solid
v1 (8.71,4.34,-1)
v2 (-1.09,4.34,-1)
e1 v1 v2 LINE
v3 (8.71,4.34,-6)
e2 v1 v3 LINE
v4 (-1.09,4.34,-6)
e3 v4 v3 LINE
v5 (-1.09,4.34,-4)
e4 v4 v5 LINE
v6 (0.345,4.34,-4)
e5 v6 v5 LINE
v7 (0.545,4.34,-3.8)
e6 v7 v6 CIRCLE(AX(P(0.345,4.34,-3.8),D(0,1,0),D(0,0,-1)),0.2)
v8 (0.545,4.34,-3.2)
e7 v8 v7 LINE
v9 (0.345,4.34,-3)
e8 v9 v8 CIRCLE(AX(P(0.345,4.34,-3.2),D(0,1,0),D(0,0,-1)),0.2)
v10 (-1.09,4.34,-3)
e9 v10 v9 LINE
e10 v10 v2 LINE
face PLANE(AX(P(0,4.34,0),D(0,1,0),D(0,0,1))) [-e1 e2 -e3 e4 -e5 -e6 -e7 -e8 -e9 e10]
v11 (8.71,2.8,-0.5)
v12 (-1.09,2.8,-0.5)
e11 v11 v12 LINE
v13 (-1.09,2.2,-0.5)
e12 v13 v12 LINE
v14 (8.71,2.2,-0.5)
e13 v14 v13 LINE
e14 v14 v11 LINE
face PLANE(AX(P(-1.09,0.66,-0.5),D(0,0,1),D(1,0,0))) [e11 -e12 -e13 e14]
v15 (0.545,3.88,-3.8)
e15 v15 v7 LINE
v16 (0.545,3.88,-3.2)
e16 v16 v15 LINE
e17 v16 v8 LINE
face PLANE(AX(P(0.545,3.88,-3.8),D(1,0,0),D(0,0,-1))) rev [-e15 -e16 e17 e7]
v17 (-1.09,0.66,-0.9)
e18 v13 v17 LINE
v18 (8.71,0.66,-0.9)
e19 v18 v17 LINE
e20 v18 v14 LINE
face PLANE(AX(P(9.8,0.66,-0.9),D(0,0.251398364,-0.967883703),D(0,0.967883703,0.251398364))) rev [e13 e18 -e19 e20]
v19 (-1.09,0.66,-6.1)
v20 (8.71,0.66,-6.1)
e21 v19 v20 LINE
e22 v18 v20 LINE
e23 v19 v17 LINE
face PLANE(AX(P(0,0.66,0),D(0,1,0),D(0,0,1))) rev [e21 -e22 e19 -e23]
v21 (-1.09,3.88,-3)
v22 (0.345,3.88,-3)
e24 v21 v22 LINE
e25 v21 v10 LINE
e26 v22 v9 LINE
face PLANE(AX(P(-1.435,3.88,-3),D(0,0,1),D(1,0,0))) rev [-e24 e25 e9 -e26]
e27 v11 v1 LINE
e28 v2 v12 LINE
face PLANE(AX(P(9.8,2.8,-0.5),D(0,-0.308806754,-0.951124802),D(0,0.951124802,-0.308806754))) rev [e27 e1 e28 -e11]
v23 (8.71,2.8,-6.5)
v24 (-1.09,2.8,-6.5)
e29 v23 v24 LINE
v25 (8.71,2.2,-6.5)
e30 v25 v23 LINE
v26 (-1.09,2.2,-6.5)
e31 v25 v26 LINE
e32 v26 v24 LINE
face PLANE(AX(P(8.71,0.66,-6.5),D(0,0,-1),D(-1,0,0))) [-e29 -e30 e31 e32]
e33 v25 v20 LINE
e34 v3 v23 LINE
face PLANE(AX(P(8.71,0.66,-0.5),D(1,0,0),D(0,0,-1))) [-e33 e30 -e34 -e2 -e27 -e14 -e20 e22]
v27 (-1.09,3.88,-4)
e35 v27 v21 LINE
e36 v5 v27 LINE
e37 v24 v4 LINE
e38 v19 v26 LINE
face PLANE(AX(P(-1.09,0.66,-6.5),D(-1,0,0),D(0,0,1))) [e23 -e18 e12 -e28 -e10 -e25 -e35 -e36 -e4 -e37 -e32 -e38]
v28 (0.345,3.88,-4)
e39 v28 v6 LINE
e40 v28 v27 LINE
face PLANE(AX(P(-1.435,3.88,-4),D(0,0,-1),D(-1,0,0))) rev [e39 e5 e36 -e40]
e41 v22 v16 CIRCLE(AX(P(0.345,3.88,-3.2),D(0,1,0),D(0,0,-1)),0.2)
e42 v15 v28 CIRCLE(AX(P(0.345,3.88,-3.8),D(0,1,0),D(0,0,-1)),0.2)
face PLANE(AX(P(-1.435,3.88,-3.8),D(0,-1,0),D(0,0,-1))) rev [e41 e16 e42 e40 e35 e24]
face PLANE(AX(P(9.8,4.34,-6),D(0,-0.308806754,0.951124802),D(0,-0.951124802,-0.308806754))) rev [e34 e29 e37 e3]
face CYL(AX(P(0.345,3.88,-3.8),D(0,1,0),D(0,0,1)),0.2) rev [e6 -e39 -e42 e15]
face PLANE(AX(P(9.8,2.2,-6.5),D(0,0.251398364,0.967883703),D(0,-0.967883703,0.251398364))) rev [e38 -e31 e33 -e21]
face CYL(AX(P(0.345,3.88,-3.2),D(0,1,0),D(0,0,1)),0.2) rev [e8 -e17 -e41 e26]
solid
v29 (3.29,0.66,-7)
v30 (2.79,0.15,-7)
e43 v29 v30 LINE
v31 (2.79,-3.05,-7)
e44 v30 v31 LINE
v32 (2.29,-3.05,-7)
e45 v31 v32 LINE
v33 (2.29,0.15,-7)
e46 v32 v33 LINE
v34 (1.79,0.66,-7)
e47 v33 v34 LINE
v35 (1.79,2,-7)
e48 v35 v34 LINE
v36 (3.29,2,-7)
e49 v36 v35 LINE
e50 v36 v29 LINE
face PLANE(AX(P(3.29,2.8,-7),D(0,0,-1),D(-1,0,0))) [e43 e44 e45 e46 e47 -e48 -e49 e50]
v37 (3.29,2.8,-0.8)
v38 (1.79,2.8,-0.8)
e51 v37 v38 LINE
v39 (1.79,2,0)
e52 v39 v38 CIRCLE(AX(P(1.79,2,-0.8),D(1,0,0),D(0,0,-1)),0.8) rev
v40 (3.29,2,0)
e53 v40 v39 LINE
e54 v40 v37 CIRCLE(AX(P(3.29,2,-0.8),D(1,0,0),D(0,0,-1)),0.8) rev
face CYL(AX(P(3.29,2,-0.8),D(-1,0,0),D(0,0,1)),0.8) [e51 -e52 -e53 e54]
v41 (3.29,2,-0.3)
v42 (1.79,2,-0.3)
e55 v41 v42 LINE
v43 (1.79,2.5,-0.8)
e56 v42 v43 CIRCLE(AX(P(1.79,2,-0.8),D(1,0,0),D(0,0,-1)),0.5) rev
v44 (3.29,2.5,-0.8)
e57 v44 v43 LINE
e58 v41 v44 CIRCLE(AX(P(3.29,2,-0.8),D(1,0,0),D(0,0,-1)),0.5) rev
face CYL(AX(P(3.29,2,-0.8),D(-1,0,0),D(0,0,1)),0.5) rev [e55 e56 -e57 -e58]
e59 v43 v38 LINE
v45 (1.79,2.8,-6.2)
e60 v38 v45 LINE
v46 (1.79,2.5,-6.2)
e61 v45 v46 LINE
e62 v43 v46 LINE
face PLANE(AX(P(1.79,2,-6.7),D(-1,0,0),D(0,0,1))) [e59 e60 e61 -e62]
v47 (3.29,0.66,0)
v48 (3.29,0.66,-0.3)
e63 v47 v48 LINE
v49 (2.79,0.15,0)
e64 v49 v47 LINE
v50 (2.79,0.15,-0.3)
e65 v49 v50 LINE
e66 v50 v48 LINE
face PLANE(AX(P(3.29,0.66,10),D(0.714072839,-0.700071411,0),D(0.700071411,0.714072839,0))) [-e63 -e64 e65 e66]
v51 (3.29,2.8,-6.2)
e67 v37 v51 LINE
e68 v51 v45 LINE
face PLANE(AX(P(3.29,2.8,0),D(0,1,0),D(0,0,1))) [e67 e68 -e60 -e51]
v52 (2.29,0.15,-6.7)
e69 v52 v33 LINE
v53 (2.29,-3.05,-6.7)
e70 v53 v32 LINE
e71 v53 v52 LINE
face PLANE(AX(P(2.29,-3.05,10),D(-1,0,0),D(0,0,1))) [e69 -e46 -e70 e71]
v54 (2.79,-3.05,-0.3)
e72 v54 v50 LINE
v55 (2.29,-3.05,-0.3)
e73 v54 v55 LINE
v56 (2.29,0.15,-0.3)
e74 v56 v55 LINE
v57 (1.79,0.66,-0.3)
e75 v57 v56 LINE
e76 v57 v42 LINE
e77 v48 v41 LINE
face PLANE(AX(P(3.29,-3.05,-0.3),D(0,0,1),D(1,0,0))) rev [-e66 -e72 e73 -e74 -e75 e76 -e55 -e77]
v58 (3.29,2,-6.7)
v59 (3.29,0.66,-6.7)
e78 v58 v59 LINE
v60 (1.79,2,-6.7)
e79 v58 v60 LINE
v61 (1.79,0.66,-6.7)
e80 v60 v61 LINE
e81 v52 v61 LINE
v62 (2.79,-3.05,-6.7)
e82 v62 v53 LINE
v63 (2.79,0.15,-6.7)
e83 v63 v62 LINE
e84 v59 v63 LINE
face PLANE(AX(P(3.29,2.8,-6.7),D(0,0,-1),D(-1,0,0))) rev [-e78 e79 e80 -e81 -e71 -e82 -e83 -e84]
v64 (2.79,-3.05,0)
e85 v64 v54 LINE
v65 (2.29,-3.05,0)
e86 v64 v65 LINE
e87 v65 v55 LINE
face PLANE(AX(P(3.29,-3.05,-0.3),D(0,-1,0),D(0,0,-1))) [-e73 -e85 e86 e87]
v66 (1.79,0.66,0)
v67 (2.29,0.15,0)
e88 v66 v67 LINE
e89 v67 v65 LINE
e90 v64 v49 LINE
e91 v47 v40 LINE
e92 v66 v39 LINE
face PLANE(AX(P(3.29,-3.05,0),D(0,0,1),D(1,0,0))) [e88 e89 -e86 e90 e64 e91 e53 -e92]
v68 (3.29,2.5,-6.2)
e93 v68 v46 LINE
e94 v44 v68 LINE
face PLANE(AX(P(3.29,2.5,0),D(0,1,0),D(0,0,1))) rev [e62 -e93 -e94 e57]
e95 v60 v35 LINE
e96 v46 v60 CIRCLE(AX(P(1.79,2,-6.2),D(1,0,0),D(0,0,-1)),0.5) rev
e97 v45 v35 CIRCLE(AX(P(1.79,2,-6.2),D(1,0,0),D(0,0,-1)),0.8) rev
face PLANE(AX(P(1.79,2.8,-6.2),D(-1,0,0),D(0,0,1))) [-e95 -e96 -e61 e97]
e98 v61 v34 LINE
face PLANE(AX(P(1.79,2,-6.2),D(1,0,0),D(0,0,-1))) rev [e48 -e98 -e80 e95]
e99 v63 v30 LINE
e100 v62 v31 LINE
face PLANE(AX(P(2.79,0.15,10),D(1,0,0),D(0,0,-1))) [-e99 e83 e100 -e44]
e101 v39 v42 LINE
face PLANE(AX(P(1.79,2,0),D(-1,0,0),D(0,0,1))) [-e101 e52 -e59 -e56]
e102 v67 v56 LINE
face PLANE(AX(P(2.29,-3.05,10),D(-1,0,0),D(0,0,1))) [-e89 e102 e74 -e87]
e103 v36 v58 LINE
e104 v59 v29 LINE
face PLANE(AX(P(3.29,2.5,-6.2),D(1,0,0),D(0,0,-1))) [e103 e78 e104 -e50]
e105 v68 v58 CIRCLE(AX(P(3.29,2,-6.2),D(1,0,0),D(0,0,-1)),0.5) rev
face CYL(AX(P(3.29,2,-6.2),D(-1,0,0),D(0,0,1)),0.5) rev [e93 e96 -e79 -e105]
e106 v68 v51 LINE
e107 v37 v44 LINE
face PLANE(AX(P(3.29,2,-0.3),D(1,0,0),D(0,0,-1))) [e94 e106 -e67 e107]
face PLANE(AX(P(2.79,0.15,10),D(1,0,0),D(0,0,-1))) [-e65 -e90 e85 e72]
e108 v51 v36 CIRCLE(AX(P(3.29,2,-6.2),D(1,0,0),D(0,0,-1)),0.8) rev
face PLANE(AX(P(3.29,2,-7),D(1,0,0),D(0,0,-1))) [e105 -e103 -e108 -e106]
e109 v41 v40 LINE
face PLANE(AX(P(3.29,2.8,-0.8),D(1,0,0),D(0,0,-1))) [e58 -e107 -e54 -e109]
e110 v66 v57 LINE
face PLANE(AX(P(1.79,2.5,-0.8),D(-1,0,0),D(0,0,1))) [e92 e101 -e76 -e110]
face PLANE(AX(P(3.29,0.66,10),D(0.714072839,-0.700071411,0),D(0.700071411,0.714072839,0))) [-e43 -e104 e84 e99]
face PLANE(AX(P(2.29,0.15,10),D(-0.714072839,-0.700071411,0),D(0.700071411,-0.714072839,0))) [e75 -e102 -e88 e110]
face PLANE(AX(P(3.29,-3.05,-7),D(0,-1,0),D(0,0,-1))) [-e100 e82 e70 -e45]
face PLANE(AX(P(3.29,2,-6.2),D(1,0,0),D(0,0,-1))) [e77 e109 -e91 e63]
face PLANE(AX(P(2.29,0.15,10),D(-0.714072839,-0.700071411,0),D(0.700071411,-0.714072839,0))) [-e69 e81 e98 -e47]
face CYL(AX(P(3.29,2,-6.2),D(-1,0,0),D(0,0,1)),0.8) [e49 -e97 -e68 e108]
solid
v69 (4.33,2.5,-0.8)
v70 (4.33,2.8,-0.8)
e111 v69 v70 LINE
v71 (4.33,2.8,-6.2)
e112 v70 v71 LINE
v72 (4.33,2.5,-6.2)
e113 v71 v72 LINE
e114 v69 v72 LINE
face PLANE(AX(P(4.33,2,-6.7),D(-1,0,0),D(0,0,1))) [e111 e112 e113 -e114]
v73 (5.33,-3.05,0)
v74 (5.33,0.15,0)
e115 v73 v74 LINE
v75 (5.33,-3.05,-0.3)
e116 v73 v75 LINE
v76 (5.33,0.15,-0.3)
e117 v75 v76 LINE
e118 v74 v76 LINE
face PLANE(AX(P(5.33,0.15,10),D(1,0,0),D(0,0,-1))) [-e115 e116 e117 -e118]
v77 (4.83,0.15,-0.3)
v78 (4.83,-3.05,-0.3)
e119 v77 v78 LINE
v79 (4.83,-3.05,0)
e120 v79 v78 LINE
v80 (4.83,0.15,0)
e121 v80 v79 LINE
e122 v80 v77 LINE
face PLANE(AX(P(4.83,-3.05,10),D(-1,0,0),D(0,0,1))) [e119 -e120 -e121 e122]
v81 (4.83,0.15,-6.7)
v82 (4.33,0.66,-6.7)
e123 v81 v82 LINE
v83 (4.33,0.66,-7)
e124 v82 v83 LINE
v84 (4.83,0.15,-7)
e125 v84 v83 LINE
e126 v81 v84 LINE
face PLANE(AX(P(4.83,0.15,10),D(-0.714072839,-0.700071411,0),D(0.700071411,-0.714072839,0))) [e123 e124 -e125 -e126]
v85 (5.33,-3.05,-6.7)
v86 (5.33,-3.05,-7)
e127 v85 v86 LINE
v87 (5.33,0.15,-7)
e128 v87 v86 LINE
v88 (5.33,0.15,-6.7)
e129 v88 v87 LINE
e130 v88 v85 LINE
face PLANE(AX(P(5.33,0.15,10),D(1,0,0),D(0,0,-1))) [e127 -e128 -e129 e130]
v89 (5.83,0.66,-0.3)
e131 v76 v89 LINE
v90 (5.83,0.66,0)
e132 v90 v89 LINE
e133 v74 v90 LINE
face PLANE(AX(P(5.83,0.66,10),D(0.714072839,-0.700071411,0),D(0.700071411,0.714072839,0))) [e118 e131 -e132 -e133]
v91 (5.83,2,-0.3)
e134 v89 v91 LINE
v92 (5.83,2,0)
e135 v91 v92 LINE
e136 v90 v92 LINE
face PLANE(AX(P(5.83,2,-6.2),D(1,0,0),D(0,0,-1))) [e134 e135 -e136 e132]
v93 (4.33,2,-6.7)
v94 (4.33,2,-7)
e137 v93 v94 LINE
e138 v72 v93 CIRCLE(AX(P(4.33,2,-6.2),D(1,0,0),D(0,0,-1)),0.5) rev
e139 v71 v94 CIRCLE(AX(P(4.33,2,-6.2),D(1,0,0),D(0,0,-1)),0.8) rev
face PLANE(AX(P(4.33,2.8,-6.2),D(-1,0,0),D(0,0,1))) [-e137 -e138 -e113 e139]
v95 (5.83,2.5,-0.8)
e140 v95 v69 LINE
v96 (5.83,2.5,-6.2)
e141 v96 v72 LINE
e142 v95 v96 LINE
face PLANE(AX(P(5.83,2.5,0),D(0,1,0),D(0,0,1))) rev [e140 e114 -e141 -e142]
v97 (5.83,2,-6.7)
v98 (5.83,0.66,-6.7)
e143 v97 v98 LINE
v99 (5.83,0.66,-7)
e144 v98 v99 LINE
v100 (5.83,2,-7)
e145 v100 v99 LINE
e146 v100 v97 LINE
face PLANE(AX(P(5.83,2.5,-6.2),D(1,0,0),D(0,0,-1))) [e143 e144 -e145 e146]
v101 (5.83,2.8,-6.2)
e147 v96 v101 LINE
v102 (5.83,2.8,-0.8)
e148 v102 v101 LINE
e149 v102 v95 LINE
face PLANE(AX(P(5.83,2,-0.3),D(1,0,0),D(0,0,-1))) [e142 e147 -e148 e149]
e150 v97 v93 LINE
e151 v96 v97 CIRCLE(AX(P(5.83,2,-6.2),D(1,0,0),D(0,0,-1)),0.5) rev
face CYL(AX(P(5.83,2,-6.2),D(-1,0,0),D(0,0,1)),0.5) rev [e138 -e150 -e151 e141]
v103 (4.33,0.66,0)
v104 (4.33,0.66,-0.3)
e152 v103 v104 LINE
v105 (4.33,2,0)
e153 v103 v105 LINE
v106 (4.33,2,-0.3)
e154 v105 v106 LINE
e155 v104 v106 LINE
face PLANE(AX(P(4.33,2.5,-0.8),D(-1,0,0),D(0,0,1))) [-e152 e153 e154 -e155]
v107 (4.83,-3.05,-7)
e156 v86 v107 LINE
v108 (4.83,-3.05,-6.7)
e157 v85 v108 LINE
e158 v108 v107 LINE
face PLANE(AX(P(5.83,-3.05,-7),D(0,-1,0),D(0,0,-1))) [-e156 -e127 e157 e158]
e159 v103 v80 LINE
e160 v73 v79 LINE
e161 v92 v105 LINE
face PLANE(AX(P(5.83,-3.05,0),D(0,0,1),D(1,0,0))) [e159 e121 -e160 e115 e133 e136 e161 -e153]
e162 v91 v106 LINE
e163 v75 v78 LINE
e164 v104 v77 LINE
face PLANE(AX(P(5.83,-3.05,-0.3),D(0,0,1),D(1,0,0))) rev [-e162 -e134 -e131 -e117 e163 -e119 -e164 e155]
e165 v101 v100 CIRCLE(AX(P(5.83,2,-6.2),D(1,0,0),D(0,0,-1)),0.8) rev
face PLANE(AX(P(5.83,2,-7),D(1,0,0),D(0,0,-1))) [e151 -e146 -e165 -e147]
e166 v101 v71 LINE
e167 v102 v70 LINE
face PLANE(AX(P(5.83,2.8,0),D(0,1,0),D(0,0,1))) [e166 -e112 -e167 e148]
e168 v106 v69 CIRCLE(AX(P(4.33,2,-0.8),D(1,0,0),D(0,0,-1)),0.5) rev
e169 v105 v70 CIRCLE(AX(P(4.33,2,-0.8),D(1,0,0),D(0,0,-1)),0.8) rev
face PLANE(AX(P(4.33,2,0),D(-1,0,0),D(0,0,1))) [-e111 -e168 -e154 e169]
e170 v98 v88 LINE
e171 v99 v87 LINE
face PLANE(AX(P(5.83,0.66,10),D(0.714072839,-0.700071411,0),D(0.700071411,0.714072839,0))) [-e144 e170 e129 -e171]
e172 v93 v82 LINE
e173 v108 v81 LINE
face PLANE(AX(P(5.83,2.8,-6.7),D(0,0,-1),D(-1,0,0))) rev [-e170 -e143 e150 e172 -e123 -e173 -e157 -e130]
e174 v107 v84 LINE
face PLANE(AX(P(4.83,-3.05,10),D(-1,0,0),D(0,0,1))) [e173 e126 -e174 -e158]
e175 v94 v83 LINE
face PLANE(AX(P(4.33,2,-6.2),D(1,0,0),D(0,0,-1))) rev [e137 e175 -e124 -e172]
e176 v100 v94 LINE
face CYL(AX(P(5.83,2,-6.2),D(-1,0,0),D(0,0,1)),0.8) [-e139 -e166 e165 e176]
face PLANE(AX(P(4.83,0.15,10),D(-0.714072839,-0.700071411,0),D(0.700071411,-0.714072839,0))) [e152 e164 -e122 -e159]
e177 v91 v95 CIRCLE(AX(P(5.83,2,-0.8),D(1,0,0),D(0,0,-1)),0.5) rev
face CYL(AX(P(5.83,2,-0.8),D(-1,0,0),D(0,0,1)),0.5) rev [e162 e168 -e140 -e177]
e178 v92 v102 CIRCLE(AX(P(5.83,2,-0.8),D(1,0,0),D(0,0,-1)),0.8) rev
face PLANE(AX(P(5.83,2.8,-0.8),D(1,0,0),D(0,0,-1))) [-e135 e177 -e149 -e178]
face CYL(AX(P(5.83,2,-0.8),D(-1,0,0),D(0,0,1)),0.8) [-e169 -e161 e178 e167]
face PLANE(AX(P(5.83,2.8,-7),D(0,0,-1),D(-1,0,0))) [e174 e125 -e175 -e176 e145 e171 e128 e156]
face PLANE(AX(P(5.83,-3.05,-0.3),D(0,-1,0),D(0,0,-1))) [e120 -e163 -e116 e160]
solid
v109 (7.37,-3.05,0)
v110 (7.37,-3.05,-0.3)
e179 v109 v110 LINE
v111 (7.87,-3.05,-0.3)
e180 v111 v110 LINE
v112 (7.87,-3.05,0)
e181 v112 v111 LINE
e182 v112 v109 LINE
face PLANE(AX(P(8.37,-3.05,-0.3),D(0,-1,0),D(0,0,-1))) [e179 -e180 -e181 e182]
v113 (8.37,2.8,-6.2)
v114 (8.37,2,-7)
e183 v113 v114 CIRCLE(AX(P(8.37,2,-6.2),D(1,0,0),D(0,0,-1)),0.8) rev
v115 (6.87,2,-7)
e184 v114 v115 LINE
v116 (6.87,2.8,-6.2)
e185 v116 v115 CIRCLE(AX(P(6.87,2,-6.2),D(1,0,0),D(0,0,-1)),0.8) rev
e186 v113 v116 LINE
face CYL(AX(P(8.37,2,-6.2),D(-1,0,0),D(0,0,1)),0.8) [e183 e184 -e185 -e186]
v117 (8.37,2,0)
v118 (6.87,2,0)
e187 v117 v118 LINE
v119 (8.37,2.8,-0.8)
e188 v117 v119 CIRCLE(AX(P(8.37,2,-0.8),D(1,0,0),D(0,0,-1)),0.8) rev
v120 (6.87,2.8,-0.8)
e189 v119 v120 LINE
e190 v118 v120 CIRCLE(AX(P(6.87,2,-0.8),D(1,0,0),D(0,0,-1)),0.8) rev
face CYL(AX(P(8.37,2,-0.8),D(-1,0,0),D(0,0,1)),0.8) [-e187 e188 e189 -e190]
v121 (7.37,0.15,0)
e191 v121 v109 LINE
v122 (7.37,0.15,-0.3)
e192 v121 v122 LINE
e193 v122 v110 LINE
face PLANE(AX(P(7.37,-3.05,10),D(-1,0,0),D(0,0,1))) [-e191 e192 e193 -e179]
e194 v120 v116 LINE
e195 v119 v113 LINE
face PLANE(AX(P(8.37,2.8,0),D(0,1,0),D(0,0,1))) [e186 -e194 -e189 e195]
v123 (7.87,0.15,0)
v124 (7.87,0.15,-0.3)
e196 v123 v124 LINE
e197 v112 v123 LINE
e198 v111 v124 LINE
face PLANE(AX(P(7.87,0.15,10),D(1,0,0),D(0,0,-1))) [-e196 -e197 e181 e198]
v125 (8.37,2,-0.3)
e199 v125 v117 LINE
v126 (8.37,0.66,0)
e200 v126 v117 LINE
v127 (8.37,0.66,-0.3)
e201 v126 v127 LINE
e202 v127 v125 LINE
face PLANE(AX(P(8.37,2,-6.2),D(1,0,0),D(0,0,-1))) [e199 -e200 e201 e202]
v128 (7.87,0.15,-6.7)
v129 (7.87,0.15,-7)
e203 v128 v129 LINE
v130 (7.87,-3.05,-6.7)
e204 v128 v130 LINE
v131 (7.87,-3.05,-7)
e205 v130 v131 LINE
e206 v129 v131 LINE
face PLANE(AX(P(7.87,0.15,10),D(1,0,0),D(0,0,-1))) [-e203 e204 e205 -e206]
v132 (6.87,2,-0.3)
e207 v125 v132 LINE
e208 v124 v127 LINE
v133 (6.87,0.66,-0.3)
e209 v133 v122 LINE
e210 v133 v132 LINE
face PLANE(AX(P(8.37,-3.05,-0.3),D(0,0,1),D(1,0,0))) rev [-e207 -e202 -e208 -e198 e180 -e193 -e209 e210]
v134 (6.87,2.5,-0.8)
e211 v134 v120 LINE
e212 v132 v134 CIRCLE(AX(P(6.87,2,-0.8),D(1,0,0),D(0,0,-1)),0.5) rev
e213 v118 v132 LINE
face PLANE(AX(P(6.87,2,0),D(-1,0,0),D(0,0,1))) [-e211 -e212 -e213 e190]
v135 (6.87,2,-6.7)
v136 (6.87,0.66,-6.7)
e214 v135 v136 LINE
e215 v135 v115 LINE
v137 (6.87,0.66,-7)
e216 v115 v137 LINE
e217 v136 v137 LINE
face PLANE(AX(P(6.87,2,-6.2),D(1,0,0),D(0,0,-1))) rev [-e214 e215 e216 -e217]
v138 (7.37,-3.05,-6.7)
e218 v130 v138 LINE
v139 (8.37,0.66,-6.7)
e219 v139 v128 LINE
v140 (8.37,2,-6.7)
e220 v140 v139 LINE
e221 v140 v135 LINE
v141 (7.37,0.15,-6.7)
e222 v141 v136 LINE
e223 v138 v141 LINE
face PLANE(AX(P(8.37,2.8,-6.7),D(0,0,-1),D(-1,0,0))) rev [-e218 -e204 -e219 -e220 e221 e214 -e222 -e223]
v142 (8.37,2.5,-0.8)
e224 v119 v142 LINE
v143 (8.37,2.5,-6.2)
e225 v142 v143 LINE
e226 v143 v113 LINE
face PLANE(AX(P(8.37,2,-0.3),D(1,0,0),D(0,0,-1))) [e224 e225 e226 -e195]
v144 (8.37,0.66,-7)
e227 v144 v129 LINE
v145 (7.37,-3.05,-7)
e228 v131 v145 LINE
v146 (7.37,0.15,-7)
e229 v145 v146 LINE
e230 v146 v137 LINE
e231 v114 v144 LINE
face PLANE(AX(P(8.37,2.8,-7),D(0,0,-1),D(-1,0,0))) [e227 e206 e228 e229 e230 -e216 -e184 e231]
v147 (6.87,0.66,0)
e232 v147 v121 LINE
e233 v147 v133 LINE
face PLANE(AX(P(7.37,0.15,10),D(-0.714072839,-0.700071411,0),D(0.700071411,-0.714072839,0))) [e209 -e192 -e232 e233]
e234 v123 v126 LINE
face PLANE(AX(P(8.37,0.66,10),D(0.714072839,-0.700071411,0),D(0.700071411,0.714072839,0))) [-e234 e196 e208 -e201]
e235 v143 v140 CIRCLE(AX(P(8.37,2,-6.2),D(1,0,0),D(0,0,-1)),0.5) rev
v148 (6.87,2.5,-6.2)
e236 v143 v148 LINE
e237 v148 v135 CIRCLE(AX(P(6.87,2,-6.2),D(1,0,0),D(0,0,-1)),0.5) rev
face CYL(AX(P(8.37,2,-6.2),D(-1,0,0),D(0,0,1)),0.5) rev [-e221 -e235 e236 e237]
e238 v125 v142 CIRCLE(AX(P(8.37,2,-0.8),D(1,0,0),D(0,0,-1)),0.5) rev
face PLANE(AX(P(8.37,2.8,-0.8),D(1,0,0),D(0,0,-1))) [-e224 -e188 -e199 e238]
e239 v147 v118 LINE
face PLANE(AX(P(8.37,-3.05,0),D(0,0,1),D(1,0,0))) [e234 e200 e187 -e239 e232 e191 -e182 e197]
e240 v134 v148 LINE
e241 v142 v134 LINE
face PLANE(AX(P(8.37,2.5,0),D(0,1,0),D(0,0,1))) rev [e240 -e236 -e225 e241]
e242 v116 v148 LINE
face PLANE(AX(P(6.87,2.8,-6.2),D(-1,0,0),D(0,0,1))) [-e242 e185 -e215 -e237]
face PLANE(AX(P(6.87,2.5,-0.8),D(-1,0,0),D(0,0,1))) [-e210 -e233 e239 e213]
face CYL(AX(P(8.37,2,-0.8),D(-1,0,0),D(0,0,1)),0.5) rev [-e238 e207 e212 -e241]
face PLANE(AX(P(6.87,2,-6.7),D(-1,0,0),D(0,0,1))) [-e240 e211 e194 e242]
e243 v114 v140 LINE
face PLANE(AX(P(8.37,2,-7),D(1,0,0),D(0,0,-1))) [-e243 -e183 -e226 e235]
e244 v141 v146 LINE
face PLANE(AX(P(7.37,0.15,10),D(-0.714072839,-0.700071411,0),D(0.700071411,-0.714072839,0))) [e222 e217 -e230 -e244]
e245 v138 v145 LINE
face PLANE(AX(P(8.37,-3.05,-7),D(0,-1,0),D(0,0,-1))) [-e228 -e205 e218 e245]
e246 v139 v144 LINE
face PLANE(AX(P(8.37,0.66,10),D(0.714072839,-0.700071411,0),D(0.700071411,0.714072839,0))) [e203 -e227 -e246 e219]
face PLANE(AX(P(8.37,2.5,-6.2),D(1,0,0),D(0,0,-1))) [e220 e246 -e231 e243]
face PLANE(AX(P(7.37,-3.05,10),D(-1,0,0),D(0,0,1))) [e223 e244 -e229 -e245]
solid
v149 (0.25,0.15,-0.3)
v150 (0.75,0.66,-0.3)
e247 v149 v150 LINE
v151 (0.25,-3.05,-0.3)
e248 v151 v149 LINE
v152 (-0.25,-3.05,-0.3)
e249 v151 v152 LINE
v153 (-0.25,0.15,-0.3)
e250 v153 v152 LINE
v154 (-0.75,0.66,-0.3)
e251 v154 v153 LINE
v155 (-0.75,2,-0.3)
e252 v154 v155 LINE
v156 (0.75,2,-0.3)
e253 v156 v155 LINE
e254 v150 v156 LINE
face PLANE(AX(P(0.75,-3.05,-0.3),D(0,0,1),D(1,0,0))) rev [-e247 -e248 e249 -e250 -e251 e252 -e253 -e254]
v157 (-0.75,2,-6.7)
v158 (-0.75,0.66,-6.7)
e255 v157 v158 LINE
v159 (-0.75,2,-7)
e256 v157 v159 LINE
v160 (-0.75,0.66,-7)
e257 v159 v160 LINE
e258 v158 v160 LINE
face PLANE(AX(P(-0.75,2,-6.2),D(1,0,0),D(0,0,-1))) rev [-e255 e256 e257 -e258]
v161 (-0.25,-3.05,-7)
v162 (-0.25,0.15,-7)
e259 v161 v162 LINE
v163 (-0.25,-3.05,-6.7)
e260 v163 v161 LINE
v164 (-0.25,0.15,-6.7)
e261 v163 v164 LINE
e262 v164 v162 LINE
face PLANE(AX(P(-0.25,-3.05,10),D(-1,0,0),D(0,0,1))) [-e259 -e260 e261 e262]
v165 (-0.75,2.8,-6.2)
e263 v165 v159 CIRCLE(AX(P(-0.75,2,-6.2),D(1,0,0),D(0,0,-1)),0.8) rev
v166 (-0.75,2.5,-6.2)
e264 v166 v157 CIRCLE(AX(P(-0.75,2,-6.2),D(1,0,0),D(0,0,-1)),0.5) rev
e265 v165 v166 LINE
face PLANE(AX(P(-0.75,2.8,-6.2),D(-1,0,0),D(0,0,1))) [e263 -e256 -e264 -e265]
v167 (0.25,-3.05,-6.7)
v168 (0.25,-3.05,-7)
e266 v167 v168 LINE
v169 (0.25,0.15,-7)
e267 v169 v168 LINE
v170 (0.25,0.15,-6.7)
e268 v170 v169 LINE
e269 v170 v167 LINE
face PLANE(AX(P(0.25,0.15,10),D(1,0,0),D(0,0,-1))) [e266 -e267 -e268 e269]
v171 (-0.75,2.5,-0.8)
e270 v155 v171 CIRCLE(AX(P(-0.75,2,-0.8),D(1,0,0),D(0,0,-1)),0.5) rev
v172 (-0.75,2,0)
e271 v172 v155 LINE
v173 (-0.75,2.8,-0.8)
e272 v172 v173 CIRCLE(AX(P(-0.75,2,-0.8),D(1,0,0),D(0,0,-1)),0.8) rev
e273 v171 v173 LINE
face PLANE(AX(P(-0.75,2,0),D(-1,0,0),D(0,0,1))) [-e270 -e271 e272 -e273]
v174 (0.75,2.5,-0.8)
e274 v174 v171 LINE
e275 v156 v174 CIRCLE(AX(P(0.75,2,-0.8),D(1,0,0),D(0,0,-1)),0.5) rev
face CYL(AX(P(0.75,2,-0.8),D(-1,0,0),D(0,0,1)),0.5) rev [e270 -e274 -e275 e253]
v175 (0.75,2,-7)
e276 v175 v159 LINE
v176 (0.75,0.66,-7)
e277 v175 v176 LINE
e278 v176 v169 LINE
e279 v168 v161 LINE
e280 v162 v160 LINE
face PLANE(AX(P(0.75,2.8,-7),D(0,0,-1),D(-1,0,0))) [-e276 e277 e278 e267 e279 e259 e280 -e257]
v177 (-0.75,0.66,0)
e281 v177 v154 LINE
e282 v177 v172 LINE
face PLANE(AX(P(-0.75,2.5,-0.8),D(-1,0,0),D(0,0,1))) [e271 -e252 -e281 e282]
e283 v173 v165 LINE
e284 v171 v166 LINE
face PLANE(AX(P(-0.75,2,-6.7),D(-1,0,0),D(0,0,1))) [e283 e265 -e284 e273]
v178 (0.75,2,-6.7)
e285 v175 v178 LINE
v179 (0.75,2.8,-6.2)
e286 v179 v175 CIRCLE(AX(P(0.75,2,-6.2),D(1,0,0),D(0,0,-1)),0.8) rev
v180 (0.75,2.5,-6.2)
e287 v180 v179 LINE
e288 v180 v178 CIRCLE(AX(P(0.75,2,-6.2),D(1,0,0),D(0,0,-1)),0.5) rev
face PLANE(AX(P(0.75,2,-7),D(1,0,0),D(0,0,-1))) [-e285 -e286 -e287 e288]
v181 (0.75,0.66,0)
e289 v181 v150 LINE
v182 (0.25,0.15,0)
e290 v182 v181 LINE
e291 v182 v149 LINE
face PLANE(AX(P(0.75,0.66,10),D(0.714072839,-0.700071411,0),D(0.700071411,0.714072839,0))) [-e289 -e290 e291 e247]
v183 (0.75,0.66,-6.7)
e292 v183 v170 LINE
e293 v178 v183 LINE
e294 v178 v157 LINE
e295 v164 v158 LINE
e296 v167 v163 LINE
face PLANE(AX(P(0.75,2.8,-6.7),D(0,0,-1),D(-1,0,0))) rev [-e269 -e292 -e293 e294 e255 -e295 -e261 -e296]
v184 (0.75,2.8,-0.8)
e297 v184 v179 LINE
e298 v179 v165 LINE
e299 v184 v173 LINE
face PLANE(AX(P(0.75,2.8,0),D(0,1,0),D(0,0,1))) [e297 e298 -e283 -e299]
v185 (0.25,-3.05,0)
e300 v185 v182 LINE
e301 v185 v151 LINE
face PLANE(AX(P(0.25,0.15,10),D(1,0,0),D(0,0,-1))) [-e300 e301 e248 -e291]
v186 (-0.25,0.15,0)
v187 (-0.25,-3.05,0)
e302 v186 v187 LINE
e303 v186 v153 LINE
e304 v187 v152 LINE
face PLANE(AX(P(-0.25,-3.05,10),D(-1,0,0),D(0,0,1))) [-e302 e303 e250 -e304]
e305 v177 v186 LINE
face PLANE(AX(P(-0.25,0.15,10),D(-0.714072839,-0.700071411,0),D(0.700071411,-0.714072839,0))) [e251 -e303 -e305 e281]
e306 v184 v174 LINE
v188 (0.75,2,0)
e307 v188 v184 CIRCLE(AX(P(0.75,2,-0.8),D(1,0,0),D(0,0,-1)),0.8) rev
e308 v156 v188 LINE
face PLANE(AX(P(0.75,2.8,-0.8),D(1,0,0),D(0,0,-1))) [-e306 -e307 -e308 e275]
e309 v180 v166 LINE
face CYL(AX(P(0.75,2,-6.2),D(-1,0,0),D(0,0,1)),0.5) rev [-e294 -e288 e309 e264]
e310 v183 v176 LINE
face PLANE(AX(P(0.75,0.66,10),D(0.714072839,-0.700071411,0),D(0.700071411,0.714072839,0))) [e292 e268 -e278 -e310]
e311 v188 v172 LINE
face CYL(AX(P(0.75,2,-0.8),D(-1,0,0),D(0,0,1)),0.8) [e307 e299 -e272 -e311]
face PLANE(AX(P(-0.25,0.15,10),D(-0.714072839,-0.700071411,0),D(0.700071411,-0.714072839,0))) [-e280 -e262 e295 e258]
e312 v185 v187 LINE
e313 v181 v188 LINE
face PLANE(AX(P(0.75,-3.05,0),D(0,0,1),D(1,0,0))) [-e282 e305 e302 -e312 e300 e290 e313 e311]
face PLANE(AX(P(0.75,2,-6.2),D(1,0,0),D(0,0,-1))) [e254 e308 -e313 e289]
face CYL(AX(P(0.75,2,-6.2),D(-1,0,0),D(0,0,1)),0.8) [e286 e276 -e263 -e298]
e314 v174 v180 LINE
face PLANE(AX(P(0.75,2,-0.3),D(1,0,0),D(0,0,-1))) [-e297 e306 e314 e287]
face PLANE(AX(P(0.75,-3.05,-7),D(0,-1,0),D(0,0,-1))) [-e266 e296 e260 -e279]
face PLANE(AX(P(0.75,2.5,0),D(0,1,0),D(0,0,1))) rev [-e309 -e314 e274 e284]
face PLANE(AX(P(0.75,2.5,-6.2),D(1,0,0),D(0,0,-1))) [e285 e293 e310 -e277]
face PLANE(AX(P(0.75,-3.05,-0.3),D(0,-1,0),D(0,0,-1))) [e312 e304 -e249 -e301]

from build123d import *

# Parameters (mm, degrees)
BODY_FEATURE_DEPTH                    = 1.84
BODY_FEATURE_DEPTH_BACK               = 1.84
SKETCH1_W                             = 9.8
SKETCH1_H                             = 6
BEVEL_FEATURE_DEPTH                   = 9.8
BEVEL_FEATURE_DEPTH_BACK              = 9.8
SIGN_FEATURE_DEPTH                    = 0.46
FIRST_AND_LAST_PIN_FEATURE_DEPTH      = 0.75
FIRST_AND_LAST_PIN_FEATURE_DEPTH_BACK = 0.75
PIN_PROFILE_FEATURE_DEPTH             = 10
PIN_PROFILE_FEATURE_DEPTH_BACK        = 10
OTHER_PINS_FEATURE_COUNT              = 4
OTHER_PINS_FEATURE_PITCH              = 2.54


# Sheet-metal steps are written as plain solids
with BuildPart() as part:
    # Sketch1 → Body Feature (new, two sides: drawn at the far end of the back side and taken through both)
    with BuildSketch(Plane(origin=(0, 2.5, 0), x_dir=(1, 0, 0), z_dir=(0, 1, 0)).offset(-BODY_FEATURE_DEPTH_BACK)):
        with Locations((3.81, 3.5)):
            Rectangle(SKETCH1_W, SKETCH1_H)
    extrude(amount=BODY_FEATURE_DEPTH + BODY_FEATURE_DEPTH_BACK)

    # Sketch2 → Bevel Feature (cut, two sides: drawn at the far end of the back side and taken through both)
    with BuildSketch(Plane(origin=(0, 0, 0), x_dir=(0, 0, -1), z_dir=(1, 0, 0)).offset(-BEVEL_FEATURE_DEPTH_BACK)):
        Polygon((-9.5, 4.382711437), (-6.267114103, 14.34), (13.267114103, 14.34), (16.5, 4.382711437), (16.5, 0.922493794), (13.834417196, -9.34), (-6.834417196, -9.34), (-9.5, 0.922493794), align=None)
        Polygon((0.5, 2.8), (1, 4.34), (6, 4.34), (6.5, 2.8), (6.5, 2.2), (6.1, 0.66), (0.9, 0.66), (0.5, 2.2), align=None, mode=Mode.SUBTRACT)
    extrude(amount=BEVEL_FEATURE_DEPTH + BEVEL_FEATURE_DEPTH_BACK, mode=Mode.SUBTRACT)

    # Sketch3 → Sign Feature (cut)
    with BuildSketch(Plane(origin=(0, 4.34, 0), x_dir=(1, 0, 0), z_dir=(0, 1, 0))):
        with BuildLine():
            Line((-1.435, 4), (0.345, 4))
            ThreePointArc((0.345, 4), (0.486421356, 3.941421356), (0.545, 3.8))
            Line((0.545, 3.8), (0.545, 3.2))
            ThreePointArc((0.545, 3.2), (0.486421356, 3.058578644), (0.345, 3))
            Line((0.345, 3), (-1.435, 3))
            ThreePointArc((-1.435, 3), (-1.576421356, 3.058578644), (-1.635, 3.2))
            Line((-1.635, 3.2), (-1.635, 3.8))
            ThreePointArc((-1.635, 3.8), (-1.576421356, 3.941421356), (-1.435, 4))
        make_face()
    extrude(amount=-SIGN_FEATURE_DEPTH, mode=Mode.SUBTRACT)


with BuildPart() as body_2:
    # Sketch4 → First and Last Pin Feature (new, two sides: drawn at the far end of the back side and taken through both)
    with BuildSketch(Plane(origin=(0, 0, 0), x_dir=(0, 0, -1), z_dir=(1, 0, 0)).offset(-FIRST_AND_LAST_PIN_FEATURE_DEPTH_BACK)):
        with BuildLine():
            Line((0, -3.05), (0, 2))
            ThreePointArc((0, 2), (0.234314575, 2.565685425), (0.8, 2.8))
            Line((0.8, 2.8), (6.2, 2.8))
            ThreePointArc((6.2, 2.8), (6.765685425, 2.565685425), (7, 2))
            Line((7, 2), (7, -3.05))
            Line((7, -3.05), (6.7, -3.05))
            Line((6.7, -3.05), (6.7, 2))
            ThreePointArc((6.7, 2), (6.553553391, 2.353553391), (6.2, 2.5))
            Line((6.2, 2.5), (0.8, 2.5))
            ThreePointArc((0.8, 2.5), (0.446446609, 2.353553391), (0.3, 2))
            Line((0.3, 2), (0.3, -3.05))
            Line((0.3, -3.05), (0, -3.05))
        make_face()
    extrude(amount=FIRST_AND_LAST_PIN_FEATURE_DEPTH + FIRST_AND_LAST_PIN_FEATURE_DEPTH_BACK)

    # Sketch9 → Pin Profile Feature (cut, two sides: drawn at the far end of the back side and taken through both)
    with BuildSketch(Plane.XY.offset(-PIN_PROFILE_FEATURE_DEPTH_BACK)):
        Polygon((-0.25, -3.05), (-0.25, 0.15), (-0.75, 0.66), (-0.75, -4.05), (0.75, -4.05), (0.75, 0.66), (0.25, 0.15), (0.25, -3.05), align=None)
    extrude(amount=PIN_PROFILE_FEATURE_DEPTH + PIN_PROFILE_FEATURE_DEPTH_BACK, mode=Mode.SUBTRACT)


with BuildPart() as other_pins_feature_1:
    # Other Pins Feature: pattern copy
    add(body_2.part.moved(Location(Vector(1, 0, 0) * (1 * OTHER_PINS_FEATURE_PITCH))))


with BuildPart() as other_pins_feature_2:
    # Other Pins Feature: pattern copy
    add(body_2.part.moved(Location(Vector(1, 0, 0) * (2 * OTHER_PINS_FEATURE_PITCH))))


with BuildPart() as other_pins_feature_3:
    # Other Pins Feature: pattern copy
    add(body_2.part.moved(Location(Vector(1, 0, 0) * (3 * OTHER_PINS_FEATURE_PITCH))))


solid = Compound([part.part, body_2.part, other_pins_feature_1.part, other_pins_feature_2.part, other_pins_feature_3.part])
